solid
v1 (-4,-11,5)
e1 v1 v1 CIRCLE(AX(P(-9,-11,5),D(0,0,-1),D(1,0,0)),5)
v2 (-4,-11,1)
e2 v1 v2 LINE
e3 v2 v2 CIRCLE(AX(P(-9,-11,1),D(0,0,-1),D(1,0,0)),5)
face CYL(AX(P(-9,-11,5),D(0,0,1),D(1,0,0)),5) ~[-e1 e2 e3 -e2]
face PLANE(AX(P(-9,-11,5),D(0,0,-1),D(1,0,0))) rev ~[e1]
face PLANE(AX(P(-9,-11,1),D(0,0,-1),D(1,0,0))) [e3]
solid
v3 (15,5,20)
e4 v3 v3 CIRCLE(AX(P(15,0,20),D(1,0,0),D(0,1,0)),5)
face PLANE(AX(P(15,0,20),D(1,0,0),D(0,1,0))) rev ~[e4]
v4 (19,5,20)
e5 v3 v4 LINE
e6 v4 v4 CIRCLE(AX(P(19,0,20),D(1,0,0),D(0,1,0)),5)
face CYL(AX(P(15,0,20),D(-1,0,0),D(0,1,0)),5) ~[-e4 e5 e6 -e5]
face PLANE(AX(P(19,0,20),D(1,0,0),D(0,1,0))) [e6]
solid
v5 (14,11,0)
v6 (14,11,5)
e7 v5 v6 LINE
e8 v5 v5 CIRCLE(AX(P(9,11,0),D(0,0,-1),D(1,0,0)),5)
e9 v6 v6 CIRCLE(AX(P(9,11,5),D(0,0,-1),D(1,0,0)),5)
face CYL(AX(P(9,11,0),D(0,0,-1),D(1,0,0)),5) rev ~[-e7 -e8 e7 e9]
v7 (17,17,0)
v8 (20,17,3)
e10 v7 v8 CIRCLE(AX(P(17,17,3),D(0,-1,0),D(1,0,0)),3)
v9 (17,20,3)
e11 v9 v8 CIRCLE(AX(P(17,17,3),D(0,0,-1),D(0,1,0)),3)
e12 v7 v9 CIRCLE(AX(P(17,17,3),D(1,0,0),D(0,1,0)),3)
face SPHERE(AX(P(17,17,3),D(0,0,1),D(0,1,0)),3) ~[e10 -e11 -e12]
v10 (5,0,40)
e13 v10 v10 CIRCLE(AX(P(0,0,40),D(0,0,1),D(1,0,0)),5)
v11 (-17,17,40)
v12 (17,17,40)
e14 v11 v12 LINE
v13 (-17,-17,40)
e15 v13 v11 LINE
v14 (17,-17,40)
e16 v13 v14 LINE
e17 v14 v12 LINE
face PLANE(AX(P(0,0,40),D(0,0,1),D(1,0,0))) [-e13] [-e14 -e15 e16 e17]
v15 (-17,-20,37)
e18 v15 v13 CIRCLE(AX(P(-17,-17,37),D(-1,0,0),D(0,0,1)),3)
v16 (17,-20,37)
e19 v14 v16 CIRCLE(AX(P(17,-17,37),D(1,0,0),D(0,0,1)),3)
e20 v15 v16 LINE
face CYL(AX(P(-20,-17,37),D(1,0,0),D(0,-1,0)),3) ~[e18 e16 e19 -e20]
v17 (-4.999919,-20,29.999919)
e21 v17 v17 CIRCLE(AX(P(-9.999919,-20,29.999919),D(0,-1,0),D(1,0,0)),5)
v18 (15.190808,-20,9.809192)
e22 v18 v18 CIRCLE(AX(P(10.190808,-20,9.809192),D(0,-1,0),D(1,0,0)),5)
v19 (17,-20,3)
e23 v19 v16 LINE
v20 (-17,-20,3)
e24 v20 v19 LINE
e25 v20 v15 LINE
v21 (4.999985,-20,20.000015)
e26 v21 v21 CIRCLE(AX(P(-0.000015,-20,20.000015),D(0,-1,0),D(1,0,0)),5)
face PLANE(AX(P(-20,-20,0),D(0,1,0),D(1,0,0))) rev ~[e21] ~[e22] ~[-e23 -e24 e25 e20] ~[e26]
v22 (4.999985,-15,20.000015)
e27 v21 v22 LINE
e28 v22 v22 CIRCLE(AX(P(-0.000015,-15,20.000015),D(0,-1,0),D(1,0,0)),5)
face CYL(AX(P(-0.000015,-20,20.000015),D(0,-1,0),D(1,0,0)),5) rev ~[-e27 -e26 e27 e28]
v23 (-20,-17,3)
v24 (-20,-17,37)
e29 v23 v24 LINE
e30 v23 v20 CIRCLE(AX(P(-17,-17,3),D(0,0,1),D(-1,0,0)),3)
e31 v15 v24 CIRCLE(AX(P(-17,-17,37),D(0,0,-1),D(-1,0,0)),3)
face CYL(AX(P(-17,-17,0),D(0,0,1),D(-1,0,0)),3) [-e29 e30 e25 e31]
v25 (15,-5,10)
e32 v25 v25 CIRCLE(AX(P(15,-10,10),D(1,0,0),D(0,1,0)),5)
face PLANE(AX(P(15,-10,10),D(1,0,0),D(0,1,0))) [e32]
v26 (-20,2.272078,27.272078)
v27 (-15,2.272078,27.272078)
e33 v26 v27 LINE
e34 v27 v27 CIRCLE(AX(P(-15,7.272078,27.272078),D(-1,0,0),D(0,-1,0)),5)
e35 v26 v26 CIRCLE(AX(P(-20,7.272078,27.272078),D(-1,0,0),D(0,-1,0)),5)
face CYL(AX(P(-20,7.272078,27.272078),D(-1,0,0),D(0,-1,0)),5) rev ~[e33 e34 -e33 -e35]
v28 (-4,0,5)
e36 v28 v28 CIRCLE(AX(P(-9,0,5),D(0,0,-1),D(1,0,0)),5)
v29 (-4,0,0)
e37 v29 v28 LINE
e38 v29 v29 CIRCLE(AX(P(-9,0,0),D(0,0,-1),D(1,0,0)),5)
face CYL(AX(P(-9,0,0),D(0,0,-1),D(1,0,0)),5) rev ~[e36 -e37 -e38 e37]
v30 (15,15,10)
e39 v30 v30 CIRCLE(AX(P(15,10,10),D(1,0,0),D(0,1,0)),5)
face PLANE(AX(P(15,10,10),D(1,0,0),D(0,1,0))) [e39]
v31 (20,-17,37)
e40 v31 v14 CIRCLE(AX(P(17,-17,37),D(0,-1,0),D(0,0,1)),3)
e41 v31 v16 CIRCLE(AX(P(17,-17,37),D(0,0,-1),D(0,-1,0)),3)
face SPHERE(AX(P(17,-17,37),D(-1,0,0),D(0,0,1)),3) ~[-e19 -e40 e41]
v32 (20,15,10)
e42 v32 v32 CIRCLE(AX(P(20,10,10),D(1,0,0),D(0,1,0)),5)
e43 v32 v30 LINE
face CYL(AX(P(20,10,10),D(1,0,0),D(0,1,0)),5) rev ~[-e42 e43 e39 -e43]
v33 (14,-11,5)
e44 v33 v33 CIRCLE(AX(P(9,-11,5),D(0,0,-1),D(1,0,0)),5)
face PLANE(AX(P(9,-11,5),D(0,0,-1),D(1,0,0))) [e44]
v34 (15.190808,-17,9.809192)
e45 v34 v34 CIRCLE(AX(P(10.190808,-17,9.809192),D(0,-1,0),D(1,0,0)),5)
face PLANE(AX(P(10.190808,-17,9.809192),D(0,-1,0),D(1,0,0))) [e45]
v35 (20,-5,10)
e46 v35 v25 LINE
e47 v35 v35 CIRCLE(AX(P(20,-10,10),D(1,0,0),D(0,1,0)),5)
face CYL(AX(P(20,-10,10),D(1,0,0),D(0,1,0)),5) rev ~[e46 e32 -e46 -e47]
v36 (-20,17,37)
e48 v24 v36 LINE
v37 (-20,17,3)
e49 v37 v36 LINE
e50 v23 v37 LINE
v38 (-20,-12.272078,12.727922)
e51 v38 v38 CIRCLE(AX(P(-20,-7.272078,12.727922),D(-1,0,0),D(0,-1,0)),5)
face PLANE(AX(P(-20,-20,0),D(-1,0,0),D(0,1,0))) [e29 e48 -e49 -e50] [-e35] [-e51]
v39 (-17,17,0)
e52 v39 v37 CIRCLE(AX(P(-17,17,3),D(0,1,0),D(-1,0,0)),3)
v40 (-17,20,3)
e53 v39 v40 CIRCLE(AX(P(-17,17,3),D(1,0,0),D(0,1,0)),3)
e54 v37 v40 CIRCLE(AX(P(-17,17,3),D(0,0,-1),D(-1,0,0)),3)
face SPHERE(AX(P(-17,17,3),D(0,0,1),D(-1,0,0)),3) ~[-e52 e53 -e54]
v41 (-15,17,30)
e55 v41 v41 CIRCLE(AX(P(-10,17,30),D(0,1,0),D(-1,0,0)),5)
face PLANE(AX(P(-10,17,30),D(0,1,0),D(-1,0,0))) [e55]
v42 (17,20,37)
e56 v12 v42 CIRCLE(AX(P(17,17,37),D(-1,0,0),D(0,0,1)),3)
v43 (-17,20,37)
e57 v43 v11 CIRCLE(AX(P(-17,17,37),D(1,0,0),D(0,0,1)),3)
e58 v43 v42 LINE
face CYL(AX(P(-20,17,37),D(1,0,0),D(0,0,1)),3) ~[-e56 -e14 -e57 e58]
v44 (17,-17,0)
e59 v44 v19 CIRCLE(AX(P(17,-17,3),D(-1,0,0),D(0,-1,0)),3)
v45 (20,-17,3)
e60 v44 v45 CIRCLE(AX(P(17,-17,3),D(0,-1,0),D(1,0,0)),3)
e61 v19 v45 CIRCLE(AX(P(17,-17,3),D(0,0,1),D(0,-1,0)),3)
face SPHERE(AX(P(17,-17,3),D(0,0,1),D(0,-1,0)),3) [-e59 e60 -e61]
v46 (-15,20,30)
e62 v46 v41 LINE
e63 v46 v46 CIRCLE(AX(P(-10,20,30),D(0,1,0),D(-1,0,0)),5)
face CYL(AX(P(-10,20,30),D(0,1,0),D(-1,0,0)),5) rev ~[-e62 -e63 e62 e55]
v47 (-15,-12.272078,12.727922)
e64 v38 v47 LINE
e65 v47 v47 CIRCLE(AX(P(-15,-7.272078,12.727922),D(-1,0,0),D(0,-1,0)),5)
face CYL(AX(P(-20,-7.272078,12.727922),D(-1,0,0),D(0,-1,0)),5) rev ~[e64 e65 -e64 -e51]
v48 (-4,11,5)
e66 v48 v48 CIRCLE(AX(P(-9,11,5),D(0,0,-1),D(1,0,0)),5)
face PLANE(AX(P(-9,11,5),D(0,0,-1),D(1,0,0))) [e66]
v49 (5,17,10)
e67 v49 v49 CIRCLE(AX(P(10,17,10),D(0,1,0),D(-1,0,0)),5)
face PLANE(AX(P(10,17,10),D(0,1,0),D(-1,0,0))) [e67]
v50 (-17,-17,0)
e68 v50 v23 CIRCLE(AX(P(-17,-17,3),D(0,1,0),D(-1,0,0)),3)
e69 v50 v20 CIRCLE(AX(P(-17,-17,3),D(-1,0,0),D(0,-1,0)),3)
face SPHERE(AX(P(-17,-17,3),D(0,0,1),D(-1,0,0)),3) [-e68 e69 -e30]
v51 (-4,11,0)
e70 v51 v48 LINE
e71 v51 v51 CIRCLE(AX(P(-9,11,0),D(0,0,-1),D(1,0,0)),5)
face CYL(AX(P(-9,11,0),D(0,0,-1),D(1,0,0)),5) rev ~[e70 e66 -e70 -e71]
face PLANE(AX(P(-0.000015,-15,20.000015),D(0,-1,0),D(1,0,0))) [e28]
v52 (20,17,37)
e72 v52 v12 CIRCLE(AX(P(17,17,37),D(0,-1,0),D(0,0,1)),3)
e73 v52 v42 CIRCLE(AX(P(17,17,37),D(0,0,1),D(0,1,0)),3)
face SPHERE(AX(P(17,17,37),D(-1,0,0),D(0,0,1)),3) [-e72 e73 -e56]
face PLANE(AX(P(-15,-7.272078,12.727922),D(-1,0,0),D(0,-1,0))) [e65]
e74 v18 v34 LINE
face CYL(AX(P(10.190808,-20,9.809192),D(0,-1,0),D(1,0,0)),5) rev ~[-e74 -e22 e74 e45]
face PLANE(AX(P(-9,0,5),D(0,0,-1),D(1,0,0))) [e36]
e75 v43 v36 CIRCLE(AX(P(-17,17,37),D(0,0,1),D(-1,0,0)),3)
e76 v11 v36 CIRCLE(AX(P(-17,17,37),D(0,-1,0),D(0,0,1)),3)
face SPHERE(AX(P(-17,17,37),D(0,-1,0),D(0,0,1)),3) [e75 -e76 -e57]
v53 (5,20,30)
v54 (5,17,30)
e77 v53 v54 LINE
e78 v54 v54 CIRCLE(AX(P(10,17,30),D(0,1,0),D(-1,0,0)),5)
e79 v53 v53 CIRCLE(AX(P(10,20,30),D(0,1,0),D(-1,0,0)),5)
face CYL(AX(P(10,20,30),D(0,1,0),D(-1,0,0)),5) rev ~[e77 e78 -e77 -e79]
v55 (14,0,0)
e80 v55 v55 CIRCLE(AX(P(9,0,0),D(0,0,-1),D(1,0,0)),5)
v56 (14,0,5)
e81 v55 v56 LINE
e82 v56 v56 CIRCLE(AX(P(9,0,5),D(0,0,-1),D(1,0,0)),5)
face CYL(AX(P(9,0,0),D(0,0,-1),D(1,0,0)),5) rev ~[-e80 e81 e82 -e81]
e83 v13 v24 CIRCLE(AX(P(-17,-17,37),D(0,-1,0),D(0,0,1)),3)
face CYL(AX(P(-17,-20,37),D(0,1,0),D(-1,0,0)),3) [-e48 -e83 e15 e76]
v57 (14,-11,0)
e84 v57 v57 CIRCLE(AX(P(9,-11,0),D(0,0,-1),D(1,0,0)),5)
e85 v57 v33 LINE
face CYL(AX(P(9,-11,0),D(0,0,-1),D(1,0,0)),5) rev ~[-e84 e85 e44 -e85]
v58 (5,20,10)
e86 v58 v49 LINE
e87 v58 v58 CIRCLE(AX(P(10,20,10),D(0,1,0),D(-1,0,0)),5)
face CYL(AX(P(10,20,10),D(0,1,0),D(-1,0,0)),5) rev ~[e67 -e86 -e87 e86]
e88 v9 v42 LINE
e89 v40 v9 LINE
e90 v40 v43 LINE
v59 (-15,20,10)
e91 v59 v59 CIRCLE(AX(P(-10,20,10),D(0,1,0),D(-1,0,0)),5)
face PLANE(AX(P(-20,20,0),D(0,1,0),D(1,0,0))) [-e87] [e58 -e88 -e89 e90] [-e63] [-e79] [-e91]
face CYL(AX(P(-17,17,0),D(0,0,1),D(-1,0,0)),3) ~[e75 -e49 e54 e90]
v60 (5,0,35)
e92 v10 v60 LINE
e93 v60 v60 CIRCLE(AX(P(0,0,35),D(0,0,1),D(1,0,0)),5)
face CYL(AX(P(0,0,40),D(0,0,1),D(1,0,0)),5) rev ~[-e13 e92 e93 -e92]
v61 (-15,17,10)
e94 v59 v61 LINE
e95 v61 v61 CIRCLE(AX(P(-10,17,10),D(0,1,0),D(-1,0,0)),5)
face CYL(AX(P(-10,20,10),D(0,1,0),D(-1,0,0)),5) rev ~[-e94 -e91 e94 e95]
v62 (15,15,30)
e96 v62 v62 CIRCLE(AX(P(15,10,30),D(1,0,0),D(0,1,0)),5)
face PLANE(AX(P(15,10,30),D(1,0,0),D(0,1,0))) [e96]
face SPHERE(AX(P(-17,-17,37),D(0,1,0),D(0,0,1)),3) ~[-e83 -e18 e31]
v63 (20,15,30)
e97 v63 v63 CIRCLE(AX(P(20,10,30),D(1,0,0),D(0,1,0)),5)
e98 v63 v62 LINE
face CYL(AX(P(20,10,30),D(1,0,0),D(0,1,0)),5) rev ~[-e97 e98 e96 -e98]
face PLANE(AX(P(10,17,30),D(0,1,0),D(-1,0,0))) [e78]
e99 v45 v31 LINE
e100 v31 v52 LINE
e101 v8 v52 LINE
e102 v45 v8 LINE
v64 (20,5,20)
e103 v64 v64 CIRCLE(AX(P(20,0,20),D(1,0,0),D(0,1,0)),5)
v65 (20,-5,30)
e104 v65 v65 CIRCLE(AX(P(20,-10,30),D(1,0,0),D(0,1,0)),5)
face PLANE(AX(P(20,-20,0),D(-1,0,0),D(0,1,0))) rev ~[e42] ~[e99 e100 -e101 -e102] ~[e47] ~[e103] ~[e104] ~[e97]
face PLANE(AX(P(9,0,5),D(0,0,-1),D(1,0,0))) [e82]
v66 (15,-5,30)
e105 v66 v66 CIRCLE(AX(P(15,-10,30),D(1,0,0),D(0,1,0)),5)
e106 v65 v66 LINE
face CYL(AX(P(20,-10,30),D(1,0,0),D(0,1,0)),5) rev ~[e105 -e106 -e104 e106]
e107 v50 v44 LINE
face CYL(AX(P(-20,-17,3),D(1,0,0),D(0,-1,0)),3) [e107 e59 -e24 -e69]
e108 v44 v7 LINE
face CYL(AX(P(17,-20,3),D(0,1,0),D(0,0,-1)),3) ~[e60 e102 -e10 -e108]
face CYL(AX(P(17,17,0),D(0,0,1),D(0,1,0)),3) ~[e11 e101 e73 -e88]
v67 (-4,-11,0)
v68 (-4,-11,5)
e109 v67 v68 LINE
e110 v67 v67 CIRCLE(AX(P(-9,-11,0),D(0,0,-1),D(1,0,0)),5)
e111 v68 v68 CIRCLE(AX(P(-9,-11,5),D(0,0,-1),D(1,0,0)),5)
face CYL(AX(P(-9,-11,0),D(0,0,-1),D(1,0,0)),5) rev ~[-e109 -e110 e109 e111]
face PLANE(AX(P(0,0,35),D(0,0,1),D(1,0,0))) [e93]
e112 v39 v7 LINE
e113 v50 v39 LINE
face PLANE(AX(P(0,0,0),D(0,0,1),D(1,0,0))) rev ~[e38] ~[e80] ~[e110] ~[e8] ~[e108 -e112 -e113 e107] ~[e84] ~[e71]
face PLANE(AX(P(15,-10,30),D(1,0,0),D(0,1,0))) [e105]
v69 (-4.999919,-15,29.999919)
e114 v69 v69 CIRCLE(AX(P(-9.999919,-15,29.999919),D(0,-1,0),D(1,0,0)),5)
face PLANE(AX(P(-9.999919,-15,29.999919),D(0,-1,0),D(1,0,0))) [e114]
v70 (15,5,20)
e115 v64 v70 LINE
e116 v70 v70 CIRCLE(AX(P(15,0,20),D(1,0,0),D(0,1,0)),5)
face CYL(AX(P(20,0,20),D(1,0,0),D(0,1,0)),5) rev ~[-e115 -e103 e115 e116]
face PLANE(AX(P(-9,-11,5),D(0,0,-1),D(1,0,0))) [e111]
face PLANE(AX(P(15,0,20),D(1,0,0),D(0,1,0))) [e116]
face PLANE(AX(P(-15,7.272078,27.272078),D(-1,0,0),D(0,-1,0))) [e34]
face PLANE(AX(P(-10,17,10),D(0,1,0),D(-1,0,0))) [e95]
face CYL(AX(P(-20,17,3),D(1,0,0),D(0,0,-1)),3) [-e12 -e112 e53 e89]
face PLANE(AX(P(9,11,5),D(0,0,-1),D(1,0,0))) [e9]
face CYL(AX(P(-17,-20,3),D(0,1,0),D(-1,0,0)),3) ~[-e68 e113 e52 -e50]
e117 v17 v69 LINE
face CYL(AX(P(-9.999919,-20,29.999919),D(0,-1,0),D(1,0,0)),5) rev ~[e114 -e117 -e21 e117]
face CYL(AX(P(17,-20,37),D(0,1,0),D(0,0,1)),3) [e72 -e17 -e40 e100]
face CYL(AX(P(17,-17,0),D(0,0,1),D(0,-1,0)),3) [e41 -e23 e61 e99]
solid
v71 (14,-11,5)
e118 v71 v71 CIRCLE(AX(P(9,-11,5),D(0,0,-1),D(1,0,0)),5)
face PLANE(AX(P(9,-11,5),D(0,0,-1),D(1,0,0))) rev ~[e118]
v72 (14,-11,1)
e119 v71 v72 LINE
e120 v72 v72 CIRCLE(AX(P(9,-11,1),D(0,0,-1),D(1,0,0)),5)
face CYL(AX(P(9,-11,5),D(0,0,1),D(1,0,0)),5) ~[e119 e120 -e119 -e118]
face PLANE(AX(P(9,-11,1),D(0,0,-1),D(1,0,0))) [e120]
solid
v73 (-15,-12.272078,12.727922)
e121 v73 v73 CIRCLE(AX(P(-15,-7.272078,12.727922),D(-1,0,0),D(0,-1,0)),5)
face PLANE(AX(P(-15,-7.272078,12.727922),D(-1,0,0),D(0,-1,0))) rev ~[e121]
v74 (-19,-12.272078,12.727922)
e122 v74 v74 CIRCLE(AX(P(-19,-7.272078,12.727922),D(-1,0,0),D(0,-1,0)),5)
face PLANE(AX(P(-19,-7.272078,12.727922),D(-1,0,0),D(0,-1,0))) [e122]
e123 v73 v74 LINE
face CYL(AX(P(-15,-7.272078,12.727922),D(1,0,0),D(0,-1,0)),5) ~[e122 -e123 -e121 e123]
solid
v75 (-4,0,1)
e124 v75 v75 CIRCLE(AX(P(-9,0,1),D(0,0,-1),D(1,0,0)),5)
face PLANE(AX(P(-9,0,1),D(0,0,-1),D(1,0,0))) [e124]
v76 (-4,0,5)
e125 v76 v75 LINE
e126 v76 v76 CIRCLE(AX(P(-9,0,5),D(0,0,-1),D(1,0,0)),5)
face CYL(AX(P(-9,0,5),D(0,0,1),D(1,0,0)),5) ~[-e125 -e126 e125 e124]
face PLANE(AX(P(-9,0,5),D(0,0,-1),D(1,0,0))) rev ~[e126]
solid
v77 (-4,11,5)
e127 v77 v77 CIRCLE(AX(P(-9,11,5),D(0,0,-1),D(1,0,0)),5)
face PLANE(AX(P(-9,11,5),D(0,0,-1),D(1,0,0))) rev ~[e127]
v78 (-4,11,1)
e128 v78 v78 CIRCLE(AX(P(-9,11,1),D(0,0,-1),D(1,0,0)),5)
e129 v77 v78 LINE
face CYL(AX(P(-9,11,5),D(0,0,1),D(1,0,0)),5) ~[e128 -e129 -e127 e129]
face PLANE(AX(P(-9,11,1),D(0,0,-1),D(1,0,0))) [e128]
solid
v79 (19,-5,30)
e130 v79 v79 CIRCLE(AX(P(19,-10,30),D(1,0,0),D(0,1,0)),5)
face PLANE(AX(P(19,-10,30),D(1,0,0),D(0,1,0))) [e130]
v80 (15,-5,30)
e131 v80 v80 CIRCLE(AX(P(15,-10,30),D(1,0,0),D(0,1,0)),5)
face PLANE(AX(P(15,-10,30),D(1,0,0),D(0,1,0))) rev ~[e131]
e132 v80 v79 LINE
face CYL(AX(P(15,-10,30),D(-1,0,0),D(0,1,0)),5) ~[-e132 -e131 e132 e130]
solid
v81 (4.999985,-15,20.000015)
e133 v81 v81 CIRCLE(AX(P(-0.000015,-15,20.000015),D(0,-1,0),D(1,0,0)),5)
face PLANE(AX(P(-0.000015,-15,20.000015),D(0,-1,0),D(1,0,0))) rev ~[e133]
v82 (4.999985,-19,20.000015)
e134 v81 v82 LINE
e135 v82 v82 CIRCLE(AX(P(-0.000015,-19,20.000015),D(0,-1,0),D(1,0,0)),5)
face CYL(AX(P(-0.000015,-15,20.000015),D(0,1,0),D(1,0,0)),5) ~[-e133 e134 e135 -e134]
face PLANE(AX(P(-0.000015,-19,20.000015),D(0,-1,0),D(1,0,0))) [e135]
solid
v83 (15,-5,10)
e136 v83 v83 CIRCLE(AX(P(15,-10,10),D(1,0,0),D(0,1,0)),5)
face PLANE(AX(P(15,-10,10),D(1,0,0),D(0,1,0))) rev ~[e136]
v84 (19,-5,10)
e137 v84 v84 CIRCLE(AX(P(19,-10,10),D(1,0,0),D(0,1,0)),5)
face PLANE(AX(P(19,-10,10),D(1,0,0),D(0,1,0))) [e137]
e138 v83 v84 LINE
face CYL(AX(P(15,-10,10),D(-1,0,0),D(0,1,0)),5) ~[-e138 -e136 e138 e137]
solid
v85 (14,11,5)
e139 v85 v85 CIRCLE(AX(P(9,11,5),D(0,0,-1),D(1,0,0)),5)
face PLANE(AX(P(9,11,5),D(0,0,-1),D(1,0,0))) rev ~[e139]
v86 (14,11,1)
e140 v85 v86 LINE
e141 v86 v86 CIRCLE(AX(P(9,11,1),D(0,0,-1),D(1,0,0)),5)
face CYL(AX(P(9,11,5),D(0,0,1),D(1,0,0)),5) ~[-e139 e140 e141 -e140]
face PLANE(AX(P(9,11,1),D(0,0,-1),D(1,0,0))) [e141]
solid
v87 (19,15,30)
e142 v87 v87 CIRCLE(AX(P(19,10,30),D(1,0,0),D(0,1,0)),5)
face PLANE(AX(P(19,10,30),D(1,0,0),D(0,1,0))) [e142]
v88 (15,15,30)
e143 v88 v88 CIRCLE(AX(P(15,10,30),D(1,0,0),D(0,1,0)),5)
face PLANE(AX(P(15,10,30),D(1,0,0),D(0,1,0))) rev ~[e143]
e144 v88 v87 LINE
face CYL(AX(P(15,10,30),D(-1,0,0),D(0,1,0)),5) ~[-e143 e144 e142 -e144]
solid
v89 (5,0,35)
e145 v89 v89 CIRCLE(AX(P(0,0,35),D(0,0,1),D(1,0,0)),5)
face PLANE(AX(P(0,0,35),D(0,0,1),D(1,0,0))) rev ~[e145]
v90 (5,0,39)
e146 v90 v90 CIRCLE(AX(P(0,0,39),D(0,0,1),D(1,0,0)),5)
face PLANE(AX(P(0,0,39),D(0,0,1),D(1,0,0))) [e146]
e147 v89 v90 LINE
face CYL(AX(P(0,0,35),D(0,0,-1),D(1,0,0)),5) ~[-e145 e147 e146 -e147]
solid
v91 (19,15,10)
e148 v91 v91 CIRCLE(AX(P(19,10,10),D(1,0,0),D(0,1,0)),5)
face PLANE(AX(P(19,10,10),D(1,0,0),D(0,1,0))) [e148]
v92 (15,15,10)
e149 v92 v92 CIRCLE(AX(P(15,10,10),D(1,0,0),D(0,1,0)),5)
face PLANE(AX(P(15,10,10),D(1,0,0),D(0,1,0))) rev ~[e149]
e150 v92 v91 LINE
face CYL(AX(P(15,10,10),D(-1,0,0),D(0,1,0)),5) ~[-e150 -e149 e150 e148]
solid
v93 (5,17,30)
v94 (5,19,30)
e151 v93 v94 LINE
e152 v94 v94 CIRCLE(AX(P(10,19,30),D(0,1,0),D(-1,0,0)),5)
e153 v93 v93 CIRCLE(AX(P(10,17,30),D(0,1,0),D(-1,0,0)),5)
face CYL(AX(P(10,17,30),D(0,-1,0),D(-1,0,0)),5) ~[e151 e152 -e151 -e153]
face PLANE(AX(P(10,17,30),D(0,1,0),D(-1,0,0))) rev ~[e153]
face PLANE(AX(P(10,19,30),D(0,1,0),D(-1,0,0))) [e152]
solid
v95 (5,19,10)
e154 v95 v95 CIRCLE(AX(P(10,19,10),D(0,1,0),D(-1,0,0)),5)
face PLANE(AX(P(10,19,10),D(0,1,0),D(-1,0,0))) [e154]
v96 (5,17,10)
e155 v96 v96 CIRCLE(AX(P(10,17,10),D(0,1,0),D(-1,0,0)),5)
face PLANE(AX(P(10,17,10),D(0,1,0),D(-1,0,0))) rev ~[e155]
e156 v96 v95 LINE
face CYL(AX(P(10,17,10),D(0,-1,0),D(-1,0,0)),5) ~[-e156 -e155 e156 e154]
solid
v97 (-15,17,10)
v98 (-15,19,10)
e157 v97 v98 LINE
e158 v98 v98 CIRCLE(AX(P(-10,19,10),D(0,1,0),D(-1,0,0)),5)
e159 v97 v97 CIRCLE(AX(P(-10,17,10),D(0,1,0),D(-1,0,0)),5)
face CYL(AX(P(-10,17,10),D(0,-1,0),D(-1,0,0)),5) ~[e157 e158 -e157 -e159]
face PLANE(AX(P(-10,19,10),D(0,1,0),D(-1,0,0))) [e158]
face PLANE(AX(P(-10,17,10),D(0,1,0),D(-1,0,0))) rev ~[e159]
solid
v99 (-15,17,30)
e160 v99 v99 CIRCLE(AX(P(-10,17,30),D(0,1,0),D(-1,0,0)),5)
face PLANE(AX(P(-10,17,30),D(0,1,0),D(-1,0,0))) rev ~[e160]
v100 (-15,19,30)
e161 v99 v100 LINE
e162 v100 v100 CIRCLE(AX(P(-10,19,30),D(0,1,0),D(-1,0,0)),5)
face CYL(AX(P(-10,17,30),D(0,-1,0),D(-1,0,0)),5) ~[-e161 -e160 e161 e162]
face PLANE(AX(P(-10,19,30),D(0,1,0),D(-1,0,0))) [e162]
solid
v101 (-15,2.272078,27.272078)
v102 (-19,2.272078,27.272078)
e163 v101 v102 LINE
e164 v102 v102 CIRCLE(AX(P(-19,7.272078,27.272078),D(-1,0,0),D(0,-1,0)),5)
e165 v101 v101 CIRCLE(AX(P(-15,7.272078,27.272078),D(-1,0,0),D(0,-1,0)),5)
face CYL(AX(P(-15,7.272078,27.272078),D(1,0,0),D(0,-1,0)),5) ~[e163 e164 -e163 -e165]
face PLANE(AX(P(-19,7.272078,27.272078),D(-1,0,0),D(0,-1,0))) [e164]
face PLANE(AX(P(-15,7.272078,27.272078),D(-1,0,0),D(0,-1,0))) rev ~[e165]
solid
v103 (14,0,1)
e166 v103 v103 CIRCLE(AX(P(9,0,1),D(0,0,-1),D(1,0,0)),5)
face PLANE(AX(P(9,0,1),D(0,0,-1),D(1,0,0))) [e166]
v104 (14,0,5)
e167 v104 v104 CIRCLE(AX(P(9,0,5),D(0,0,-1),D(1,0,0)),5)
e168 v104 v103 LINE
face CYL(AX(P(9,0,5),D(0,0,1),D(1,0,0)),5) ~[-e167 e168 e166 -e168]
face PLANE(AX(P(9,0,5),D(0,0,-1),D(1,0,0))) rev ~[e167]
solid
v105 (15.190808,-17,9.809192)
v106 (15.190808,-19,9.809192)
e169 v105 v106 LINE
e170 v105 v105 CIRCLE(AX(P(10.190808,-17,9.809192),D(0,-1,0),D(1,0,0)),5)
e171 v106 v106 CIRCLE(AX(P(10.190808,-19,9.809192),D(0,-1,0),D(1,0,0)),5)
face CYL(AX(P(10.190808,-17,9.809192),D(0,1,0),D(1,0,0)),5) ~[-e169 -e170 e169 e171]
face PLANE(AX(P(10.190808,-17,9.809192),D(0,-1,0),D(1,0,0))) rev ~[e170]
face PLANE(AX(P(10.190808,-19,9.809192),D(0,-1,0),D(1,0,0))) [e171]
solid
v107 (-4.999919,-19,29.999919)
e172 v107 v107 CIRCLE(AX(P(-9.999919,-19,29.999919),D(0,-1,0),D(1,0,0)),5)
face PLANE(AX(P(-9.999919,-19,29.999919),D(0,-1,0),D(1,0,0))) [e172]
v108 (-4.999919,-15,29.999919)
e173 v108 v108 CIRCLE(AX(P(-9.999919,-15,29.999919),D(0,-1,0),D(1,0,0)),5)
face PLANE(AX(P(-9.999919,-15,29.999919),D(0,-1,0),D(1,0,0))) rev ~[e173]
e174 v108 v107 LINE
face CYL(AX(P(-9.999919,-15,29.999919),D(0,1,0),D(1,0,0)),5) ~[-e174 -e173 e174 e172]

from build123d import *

# Parameters (mm, degrees)
F0_W      = 40
F0_H      = 40
F1_DEPTH  = 40
F2_R      = 5
F3_DEPTH  = 5
F4_R      = 5
F5_DEPTH  = 5
F6_DEPTH  = 4
F7_DEPTH  = 4
F8_R      = 5
F9_DEPTH  = 5
F10_DEPTH = 4
F11_R     = 5
F12_DEPTH = 5
F13_DEPTH = 4
F14_R     = 5
F15_DEPTH = 5
F16_DEPTH = 3
F17_DEPTH = 4
F18_DEPTH = 2
F19_R     = 5
F20_DEPTH = 3
F21_DEPTH = 2
F22_R     = 3


# Not quite as in the source:
# - a feature names something its author has since deleted; it is built from what else it names


with BuildPart() as f1:
    # F0 (on Top) → F1 (new body)
    with BuildSketch(Plane.XY):
        Rectangle(F0_W, F0_H)
    extrude(amount=F1_DEPTH)

    # F2 (on face) → F3 (cut)
    with BuildSketch(Plane.XY.offset(40)):
        Circle(F2_R)
    extrude(amount=-F3_DEPTH, mode=Mode.SUBTRACT)

    # F4 (on face) → F5 (cut)
    with BuildSketch(Plane.YZ.offset(20)):
        with Locations((-10, 30)):
            Circle(F4_R)
        with Locations((0, 20)):
            Circle(F4_R)
        with Locations((10, 30)):
            Circle(F4_R)
        with Locations((10, 10)):
            Circle(F4_R)
        with Locations((-10, 10)):
            Circle(F4_R)
    extrude(amount=-F5_DEPTH, mode=Mode.SUBTRACT)


with BuildPart() as f6:
    # F6 (new): a face of the model
    f6_faces = [f1.part.faces().sort_by_distance(p)[0] for p in [
        (15, -10, 30),
    ]]
    extrude(f6_faces, amount=F6_DEPTH)


with BuildPart() as f6b:
    # F6#2 (new): a face of the model
    f6_2_faces = [f1.part.faces().sort_by_distance(p)[0] for p in [
        (15, 10, 30),
    ]]
    extrude(f6_2_faces, amount=F6_DEPTH)


with BuildPart() as f6c:
    # F6#3 (new): a face of the model
    f6_3_faces = [f1.part.faces().sort_by_distance(p)[0] for p in [
        (15, 0, 20),
    ]]
    extrude(f6_3_faces, amount=F6_DEPTH)


with BuildPart() as f6d:
    # F6#4 (new): a face of the model
    f6_4_faces = [f1.part.faces().sort_by_distance(p)[0] for p in [
        (15, -10, 10),
    ]]
    extrude(f6_4_faces, amount=F6_DEPTH)


with BuildPart() as f6e:
    # F6#5 (new): a face of the model
    f6_5_faces = [f1.part.faces().sort_by_distance(p)[0] for p in [
        (15, 10, 10),
    ]]
    extrude(f6_5_faces, amount=F6_DEPTH)


with BuildPart() as f7:
    # F7 (new): a face of the model
    f7_faces = [f1.part.faces().sort_by_distance(p)[0] for p in [
        (0, 0, 35),
    ]]
    extrude(f7_faces, amount=F7_DEPTH)


with BuildPart() as f1_1:
    add(f1.part)

    # F8 (on face) → F9 (cut)
    with BuildSketch(Plane(origin=(0, 0, 0), x_dir=(1, 0, 0), z_dir=(0, 0, -1))):
        with Locations((-9, 11)):
            Circle(F8_R)
        with Locations((-9, 0)):
            Circle(F8_R)
        with Locations((-9, -11)):
            Circle(F8_R)
        with Locations((9, -11)):
            Circle(F8_R)
        with Locations((9, 0)):
            Circle(F8_R)
        with Locations((9, 11)):
            Circle(F8_R)
    extrude(amount=-F9_DEPTH, mode=Mode.SUBTRACT)


with BuildPart() as f10:
    # F10 (new): a face of the model
    f10_faces = [f1_1.part.faces().sort_by_distance(p)[0] for p in [
        (-9, -11, 5),
    ]]
    extrude(f10_faces, amount=F10_DEPTH)


with BuildPart() as f10b:
    # F10#2 (new): a face of the model
    f10_2_faces = [f1_1.part.faces().sort_by_distance(p)[0] for p in [
        (-9, 0, 5),
    ]]
    extrude(f10_2_faces, amount=F10_DEPTH)


with BuildPart() as f10c:
    # F10#3 (new): a face of the model
    f10_3_faces = [f1_1.part.faces().sort_by_distance(p)[0] for p in [
        (-9, 11, 5),
    ]]
    extrude(f10_3_faces, amount=F10_DEPTH)


with BuildPart() as f10d:
    # F10#4 (new): a face of the model
    f10_4_faces = [f1_1.part.faces().sort_by_distance(p)[0] for p in [
        (9, 11, 5),
    ]]
    extrude(f10_4_faces, amount=F10_DEPTH)


with BuildPart() as f10e:
    # F10#5 (new): a face of the model
    f10_5_faces = [f1_1.part.faces().sort_by_distance(p)[0] for p in [
        (9, 0, 5),
    ]]
    extrude(f10_5_faces, amount=F10_DEPTH)


with BuildPart() as f10f:
    # F10#6 (new): a face of the model
    f10_6_faces = [f1_1.part.faces().sort_by_distance(p)[0] for p in [
        (9, -11, 5),
    ]]
    extrude(f10_6_faces, amount=F10_DEPTH)


with BuildPart() as f1_2:
    add(f1_1.part)

    # F11 (on face) → F12 (cut)
    with BuildSketch(Plane(origin=(-20, 0, 0), x_dir=(0, -1, 0), z_dir=(-1, 0, 0))):
        with Locations((-7.2720779386, 27.2720779386)):
            Circle(F11_R)
        with Locations((7.2720779386, 12.7279220614)):
            Circle(F11_R)
    extrude(amount=-F12_DEPTH, mode=Mode.SUBTRACT)


with BuildPart() as f13:
    # F13 (new): a face of the model
    f13_faces = [f1_2.part.faces().sort_by_distance(p)[0] for p in [
        (-15, 7.2720779386, 27.2720779386),
    ]]
    extrude(f13_faces, amount=F13_DEPTH)


with BuildPart() as f13b:
    # F13#2 (new): a face of the model
    f13_2_faces = [f1_2.part.faces().sort_by_distance(p)[0] for p in [
        (-15, -7.2720779386, 12.7279220614),
    ]]
    extrude(f13_2_faces, amount=F13_DEPTH)


with BuildPart() as f1_3:
    add(f1_2.part)

    # F14 (on face) → F15 (cut)
    with BuildSketch(Plane.XZ.offset(20)):
        with Locations((-9.9999191238, 29.9999191238)):
            Circle(F14_R)
        with Locations((-1.50242e-05, 20.0000150242)):
            Circle(F14_R)
    extrude(amount=-F15_DEPTH, mode=Mode.SUBTRACT)

    # F14 (on face) → F16 (cut)
    with BuildSketch(Plane.XZ.offset(20)):
        with Locations((10.1908079062, 9.8091920938)):
            Circle(F14_R)
    extrude(amount=-F16_DEPTH, mode=Mode.SUBTRACT)


with BuildPart() as f17:
    # F17 (new): a face of the model
    f17_faces = [f1_3.part.faces().sort_by_distance(p)[0] for p in [
        (-9.9999191238, -15, 29.9999191238),
    ]]
    extrude(f17_faces, amount=F17_DEPTH)


with BuildPart() as f17b:
    # F17#2 (new): a face of the model
    f17_2_faces = [f1_3.part.faces().sort_by_distance(p)[0] for p in [
        (-1.50242e-05, -15, 20.0000150242),
    ]]
    extrude(f17_2_faces, amount=F17_DEPTH)


with BuildPart() as f18:
    # F18 (new): a face of the model
    f18_faces = [f1_3.part.faces().sort_by_distance(p)[0] for p in [
        (10.1908079062, -17, 9.8091920938),
    ]]
    extrude(f18_faces, amount=F18_DEPTH)


with BuildPart() as f1_4:
    add(f1_3.part)

    # F19 (on face) → F20 (cut)
    with BuildSketch(Plane(origin=(0, 20, 0), x_dir=(-1, 0, 0), z_dir=(0, 1, 0))):
        with Locations((-10, 30)):
            Circle(F19_R)
        with Locations((10, 30)):
            Circle(F19_R)
        with Locations((10, 10)):
            Circle(F19_R)
        with Locations((-10, 10)):
            Circle(F19_R)
    extrude(amount=-F20_DEPTH, mode=Mode.SUBTRACT)


with BuildPart() as f21:
    # F21 (new): a face of the model
    f21_faces = [f1_4.part.faces().sort_by_distance(p)[0] for p in [
        (10, 17, 30),
    ]]
    extrude(f21_faces, amount=F21_DEPTH)


with BuildPart() as f21b:
    # F21#2 (new): a face of the model
    f21_2_faces = [f1_4.part.faces().sort_by_distance(p)[0] for p in [
        (-10, 17, 30),
    ]]
    extrude(f21_2_faces, amount=F21_DEPTH)


with BuildPart() as f21c:
    # F21#3 (new): a face of the model
    f21_3_faces = [f1_4.part.faces().sort_by_distance(p)[0] for p in [
        (-10, 17, 10),
    ]]
    extrude(f21_3_faces, amount=F21_DEPTH)


with BuildPart() as f21d:
    # F21#4 (new): a face of the model
    f21_4_faces = [f1_4.part.faces().sort_by_distance(p)[0] for p in [
        (10, 17, 10),
    ]]
    extrude(f21_4_faces, amount=F21_DEPTH)


with BuildPart() as f1_5:
    add(f1_4.part)

    # F22
    f22_edges = [f1_5.edges().sort_by_distance(p)[0] for p in [
        (-20, 0, 40),
        (0, 20, 40),
        (0, -20, 40),
        (-20, -20, 20),
        (20, 0, 40),
        (20, -20, 20),
        (20, 20, 20),
        (-20, 20, 20),
        (-20, 0, 0),
        (0, 20, 0),
        (0, -20, 0),
        (20, 0, 0),
    ]]
    fillet(f22_edges, radius=F22_R)


solid = Compound([f6.part, f6b.part, f6c.part, f6d.part, f6e.part, f7.part, f10.part, f10b.part, f10c.part, f10d.part, f10e.part, f10f.part, f13.part, f13b.part, f17.part, f17b.part, f18.part, f21.part, f21b.part, f21c.part, f21d.part, f1_5.part])
